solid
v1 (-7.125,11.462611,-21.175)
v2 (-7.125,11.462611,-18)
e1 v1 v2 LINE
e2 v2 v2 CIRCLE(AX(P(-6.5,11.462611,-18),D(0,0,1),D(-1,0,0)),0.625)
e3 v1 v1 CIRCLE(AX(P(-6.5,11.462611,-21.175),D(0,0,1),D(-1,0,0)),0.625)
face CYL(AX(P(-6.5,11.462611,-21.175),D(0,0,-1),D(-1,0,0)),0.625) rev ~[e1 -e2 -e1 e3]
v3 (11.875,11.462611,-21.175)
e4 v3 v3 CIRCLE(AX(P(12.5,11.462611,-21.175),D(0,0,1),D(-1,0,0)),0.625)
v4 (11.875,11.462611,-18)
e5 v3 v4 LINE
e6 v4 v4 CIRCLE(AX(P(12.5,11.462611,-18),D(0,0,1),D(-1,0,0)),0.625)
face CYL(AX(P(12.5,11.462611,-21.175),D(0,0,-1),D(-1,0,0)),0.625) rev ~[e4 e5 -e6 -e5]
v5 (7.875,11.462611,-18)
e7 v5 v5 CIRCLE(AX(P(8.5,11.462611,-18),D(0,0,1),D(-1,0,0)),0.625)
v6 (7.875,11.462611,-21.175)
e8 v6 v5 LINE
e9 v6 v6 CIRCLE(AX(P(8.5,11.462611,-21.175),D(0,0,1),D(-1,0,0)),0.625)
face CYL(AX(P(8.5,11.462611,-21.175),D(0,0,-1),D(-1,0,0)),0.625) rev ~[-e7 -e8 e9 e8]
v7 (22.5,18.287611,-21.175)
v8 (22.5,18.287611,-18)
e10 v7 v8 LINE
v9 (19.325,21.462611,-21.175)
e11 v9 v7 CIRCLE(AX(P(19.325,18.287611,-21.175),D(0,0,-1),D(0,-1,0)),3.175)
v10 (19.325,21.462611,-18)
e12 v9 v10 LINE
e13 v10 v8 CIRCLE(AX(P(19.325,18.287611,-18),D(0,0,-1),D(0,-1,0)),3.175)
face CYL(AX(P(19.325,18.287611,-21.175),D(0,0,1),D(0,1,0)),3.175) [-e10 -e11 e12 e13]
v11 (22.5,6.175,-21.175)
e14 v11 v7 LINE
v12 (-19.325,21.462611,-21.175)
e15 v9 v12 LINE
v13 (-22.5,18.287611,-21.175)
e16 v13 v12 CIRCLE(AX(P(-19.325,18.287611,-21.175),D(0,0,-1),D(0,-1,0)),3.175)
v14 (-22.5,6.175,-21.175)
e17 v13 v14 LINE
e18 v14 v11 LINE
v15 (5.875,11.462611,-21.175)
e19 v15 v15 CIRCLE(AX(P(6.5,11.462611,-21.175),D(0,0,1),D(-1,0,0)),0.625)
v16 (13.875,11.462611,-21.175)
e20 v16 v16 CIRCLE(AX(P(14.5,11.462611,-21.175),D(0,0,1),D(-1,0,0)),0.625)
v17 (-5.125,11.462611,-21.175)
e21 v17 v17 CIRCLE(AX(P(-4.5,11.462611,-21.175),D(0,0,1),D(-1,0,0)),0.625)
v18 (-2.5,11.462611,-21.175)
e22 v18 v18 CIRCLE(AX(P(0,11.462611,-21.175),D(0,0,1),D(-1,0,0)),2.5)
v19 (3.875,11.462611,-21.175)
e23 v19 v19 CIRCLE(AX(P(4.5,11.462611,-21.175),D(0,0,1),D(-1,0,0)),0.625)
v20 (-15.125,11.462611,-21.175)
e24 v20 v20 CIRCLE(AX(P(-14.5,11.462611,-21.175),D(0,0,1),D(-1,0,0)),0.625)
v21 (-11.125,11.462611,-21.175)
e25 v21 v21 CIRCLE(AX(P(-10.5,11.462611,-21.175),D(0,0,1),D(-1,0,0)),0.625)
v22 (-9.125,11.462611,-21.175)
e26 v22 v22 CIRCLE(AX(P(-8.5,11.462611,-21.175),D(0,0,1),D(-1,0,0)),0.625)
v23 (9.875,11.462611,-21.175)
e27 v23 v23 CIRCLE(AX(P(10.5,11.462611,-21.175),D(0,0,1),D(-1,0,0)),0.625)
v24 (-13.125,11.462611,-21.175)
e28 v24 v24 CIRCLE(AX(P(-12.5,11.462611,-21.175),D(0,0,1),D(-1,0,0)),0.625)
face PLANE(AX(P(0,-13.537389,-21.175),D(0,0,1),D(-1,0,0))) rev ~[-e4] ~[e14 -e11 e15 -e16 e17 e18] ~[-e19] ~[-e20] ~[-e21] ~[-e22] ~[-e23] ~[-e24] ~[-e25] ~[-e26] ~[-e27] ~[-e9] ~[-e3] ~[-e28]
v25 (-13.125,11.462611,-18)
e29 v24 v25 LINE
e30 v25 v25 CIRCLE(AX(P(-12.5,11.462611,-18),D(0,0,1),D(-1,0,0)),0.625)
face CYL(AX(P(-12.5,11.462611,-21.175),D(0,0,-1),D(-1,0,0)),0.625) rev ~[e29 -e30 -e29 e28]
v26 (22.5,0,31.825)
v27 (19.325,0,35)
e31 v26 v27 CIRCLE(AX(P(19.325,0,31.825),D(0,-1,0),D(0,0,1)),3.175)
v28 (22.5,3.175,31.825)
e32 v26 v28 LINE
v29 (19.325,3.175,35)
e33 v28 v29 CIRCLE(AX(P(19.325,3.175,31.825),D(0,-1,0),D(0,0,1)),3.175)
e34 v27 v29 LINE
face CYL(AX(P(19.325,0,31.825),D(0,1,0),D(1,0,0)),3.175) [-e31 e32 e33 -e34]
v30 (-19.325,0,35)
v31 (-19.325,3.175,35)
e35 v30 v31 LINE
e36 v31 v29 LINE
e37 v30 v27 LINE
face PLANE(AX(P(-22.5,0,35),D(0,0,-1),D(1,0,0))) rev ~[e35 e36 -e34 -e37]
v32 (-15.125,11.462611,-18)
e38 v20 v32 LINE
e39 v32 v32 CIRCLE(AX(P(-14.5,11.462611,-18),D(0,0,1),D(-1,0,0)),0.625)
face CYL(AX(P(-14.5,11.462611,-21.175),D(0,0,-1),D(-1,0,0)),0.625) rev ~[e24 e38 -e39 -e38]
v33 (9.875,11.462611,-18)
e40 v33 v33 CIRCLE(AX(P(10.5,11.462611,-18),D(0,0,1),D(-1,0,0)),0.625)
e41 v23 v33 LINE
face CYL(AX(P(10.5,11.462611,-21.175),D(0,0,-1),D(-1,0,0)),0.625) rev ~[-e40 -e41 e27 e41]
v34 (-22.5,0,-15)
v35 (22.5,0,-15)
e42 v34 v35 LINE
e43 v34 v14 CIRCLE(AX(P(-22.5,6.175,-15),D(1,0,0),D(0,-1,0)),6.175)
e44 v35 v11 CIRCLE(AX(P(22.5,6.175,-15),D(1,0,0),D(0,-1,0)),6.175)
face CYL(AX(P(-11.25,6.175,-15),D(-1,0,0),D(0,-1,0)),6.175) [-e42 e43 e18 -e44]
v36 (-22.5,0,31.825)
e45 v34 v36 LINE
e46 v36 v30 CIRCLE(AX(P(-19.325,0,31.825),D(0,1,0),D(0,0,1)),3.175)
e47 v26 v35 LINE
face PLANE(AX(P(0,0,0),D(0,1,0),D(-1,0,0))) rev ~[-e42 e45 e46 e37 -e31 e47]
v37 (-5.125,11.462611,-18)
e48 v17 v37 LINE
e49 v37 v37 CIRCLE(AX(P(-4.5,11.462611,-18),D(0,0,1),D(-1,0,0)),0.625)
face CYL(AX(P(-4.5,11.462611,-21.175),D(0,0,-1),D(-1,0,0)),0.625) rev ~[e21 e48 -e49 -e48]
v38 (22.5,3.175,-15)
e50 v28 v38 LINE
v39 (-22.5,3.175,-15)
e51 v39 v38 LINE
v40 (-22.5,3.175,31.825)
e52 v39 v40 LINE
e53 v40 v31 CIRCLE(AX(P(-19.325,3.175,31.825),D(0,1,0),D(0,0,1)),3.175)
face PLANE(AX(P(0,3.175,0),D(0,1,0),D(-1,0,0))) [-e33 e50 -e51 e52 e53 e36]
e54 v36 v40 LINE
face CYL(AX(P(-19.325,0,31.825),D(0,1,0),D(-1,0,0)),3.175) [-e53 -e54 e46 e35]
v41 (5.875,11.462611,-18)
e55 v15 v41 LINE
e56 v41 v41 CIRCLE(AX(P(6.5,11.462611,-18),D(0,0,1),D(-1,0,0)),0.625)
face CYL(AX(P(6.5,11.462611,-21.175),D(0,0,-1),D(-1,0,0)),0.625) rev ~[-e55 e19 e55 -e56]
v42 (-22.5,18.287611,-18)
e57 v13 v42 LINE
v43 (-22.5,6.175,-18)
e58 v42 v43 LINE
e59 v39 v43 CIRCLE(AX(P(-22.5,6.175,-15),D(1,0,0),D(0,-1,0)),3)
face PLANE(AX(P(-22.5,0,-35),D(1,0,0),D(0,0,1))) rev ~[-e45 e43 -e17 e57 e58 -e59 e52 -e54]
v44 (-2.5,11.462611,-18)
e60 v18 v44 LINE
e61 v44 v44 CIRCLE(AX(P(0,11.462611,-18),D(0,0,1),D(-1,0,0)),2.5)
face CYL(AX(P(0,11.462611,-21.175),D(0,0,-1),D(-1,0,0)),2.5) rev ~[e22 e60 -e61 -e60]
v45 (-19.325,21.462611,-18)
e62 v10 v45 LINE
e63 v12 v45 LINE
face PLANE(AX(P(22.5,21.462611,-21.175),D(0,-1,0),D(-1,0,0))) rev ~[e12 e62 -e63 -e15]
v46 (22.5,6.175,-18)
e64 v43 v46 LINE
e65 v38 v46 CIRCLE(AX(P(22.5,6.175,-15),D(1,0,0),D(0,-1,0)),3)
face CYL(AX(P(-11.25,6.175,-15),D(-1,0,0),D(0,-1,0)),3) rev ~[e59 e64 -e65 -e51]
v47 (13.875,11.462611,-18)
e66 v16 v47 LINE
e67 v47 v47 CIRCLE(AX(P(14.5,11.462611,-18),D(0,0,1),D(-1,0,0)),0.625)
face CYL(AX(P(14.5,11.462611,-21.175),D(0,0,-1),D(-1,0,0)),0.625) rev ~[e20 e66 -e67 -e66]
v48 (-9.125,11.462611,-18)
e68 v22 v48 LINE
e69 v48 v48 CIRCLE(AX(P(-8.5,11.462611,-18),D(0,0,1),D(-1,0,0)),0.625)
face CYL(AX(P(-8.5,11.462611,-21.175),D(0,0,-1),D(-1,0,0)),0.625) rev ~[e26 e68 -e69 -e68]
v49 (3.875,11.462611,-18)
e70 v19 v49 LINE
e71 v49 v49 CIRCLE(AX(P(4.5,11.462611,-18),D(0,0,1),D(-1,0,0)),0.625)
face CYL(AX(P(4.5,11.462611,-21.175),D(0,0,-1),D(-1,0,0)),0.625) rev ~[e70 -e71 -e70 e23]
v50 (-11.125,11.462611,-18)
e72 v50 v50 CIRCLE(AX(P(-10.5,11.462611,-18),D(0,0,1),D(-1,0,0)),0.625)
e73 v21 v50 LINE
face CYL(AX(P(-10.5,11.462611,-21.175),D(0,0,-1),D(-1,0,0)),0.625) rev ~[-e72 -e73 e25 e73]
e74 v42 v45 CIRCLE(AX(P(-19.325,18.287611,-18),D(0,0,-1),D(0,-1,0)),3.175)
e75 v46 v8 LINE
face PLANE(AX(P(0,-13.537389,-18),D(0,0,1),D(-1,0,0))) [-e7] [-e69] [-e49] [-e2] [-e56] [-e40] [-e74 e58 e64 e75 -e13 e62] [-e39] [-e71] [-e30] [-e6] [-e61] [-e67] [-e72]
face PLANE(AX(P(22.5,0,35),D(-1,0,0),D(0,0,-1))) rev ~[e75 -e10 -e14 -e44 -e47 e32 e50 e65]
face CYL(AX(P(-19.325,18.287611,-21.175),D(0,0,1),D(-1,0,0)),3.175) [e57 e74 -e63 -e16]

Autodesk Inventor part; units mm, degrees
ref_plane "YZ Plane" through (0, 0, 0) normal (1, 0, 0) x (0, 1, 0)
ref_plane "XZ Plane" through (0, 0, 0) normal (0, 1, 0) x (-1, 0, 0)
ref_plane "XY Plane" through (0, 0, 0) normal (0, 0, 1) x (1, 0, 0)
sketch "Sketch1" plane through (0, 0, 0) normal (0, 1, 0) x (-1, 0, 0)
  line L0 (22.5, 35) -> (-22.5, 35)
  line L1 (-22.5, 35) -> (-22.5, -35)
  line L2 (-22.5, -35) -> (22.5, -35)
  line L3 (22.5, -35) -> (22.5, 35)
  line L4 (22.5, 35) -> (-22.5, -35) construction
  line L5 (-22.5, 35) -> (22.5, -35) construction
  line L6 (0, 0) -> (0, -35) construction
  circle A0 centre (0, -25) radius 2.5
  circle A1 centre (0, -25) radius 4.5 construction
  line L7 (0, -25) -> (-4.5, -25) construction
  circle A2 centre (-4.5, -25) radius 0.625
  circle A3 centre (-6.5, -25) radius 0.625
  circle A4 centre (-8.5, -25) radius 0.625
  circle A5 centre (-10.5, -25) radius 0.625
  circle A6 centre (-12.5, -25) radius 0.625
  circle A7 centre (-14.5, -25) radius 0.625
  circle A8 centre (4.5, -25) radius 0.625
  circle A9 centre (6.5, -25) radius 0.625
  circle A10 centre (8.5, -25) radius 0.625
  circle A11 centre (10.5, -25) radius 0.625
  circle A12 centre (12.5, -25) radius 0.625
  circle A13 centre (14.5, -25) radius 0.625
  dimension "d3" = 9
  dimension "d0" = 45
  dimension "d1" = 70
  dimension "d2" = 5
  dimension "d4" = 1.25
  dimension "d7" = 2
  dimension "d14" = 360
  dimension "d16" = 10
extrude "Extrusion1" add sketch "Sketch1" along normal blind 3.175
fillet "Fillet1" radius 3.175 4 edges at (22.5, 1.5875, -35) (-22.5, 1.5875, -35) (-22.5, 1.5875, 35) (22.5, 1.5875, 35)
sketch "Sketch2" plane through (0, 3.175, 0) normal (0, 1, 0) x (1, 0, 0)
  line L0 (-22.5, 31.825) -> (-22.5, -31.825) projected
  line L1 (-22.5, 15) -> (22.5, 15)
  line L2 (22.5, -31.825) -> (22.5, 31.825) projected
  line L3 (19.325, 35) -> (-19.325, 35) projected
  point P0 (0, 0)
  dimension "d20" = 20
bend part "Bend Part1" radius 3 angle 90 line through (-22.5, 3.175, -15) along (1, 0, 0) centre toward (0, 1, 0) moving side (0, 0, -1) both sides no
properties part number "Platform"
